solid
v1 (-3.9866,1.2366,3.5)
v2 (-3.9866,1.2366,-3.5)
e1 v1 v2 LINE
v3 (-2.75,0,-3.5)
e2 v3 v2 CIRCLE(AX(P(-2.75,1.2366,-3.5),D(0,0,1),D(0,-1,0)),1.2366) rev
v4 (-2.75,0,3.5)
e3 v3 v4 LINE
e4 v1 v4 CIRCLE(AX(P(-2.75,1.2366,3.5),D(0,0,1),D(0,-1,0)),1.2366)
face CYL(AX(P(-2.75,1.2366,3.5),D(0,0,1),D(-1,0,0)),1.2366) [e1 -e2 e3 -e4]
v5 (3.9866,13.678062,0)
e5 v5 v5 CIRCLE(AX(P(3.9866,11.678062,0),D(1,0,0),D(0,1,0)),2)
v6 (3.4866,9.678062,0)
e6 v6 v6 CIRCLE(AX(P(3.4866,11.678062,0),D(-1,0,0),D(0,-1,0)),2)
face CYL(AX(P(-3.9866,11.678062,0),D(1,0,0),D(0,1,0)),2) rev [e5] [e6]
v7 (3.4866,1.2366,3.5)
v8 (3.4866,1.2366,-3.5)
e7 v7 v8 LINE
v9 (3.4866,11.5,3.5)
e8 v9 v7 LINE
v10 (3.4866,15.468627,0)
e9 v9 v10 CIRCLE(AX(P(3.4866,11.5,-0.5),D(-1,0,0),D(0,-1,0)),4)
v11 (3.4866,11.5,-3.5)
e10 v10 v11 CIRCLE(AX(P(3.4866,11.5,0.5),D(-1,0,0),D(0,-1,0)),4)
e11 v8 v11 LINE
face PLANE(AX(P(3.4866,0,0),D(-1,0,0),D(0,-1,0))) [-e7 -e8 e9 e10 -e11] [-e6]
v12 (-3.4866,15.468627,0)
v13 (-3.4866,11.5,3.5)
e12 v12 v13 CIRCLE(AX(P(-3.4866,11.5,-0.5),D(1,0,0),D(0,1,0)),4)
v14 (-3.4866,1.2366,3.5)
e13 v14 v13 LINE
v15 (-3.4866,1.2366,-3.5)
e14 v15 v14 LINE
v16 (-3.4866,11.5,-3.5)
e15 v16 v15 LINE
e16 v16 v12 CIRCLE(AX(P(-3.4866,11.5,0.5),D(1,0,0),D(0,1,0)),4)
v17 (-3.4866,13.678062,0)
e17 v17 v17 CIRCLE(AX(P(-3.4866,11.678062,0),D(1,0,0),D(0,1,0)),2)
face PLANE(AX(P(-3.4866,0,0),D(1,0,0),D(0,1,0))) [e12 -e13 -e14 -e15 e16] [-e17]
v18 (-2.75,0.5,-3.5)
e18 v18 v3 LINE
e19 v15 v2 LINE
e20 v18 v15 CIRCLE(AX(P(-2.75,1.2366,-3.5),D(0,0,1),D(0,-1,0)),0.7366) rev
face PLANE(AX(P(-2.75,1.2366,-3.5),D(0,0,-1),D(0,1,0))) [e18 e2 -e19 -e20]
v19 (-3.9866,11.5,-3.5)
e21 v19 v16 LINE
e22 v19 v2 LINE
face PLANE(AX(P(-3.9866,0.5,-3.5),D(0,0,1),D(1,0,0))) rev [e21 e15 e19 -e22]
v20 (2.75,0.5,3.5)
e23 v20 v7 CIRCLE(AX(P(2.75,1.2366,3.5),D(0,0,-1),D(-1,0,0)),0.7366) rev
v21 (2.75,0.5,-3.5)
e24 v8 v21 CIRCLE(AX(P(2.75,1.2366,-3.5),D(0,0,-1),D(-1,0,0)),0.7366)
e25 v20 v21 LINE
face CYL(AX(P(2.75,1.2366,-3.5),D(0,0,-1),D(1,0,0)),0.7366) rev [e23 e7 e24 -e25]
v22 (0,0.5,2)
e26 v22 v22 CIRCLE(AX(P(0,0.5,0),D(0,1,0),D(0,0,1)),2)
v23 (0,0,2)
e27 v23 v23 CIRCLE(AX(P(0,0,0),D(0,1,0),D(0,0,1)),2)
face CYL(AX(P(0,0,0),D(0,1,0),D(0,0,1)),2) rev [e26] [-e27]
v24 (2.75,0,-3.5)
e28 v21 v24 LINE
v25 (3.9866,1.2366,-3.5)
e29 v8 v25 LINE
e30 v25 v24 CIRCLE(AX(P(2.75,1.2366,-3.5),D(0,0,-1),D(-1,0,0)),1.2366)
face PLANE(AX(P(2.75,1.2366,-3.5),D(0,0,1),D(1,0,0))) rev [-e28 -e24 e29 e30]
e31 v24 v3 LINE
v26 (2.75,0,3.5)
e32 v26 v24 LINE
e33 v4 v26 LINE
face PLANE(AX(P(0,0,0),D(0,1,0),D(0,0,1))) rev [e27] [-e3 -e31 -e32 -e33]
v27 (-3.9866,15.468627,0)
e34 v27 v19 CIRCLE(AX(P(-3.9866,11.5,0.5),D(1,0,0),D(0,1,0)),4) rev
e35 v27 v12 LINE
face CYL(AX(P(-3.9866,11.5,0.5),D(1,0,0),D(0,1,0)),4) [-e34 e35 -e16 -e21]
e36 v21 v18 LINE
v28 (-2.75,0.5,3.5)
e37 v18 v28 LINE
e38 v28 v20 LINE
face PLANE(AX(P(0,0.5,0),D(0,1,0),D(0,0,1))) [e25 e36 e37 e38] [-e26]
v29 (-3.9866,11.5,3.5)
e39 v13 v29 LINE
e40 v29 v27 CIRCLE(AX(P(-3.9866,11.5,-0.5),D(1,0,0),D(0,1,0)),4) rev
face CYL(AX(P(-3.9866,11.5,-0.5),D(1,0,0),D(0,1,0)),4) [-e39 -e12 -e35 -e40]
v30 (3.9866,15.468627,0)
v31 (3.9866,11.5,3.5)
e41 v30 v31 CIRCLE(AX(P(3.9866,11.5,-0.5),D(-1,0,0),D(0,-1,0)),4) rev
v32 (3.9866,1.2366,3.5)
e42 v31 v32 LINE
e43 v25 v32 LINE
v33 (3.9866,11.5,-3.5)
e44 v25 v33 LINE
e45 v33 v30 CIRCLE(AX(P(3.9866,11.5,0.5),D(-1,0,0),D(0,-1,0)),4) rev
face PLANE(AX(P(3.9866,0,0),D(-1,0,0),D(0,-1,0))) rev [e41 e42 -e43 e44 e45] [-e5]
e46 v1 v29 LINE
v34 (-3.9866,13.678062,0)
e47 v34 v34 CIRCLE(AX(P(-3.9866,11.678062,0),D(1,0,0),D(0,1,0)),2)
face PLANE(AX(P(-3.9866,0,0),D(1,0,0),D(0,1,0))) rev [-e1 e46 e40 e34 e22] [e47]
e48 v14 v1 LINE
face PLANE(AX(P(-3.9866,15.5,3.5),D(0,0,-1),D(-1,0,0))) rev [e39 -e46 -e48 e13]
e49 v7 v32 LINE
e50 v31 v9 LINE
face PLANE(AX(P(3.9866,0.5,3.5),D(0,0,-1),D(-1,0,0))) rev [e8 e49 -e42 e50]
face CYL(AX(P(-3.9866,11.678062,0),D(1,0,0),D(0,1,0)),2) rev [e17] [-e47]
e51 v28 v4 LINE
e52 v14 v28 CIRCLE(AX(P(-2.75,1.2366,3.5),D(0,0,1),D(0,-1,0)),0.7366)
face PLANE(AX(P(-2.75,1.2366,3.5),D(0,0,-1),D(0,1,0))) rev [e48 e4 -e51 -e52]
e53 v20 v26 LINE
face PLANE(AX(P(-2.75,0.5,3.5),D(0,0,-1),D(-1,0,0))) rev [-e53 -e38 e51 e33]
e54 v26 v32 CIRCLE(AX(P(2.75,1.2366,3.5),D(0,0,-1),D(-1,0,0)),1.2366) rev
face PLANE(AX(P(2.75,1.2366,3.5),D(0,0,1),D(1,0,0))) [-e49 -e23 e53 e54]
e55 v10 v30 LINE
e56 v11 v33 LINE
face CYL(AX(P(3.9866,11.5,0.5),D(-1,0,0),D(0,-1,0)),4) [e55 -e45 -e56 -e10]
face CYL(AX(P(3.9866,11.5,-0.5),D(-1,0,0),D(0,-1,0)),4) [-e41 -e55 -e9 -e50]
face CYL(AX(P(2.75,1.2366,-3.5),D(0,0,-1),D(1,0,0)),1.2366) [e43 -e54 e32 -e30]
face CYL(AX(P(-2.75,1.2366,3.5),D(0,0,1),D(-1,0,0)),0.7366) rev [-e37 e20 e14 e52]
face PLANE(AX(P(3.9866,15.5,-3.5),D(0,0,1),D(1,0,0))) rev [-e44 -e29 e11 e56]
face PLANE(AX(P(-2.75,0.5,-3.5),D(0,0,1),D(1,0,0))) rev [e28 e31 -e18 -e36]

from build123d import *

# Parameters (mm, degrees)
SKETCH1_W          = 5.5
SKETCH1_H          = 7
BASE_FLANGE1_DEPTH = 0.5
EDGE_FLANGE1_DEPTH = 7
EDGE_FLANGE2_DEPTH = 7
FILLET1_R          = 4
SKETCH12_R         = 2
CUT_EXTRUDE1_DEPTH = 16.880893326
SKETCH13_R         = 2
CUT_EXTRUDE2_DEPTH = 18.75106584


# Sheet-metal steps are written as plain solids
with BuildPart() as part:
    # Sketch1 → Base-Flange1 (new body)
    with BuildSketch(Plane(origin=(0, 0, 0), x_dir=(1, 0, 0), z_dir=(0, 1, 0))):
        Rectangle(SKETCH1_W, SKETCH1_H)
    extrude(amount=BASE_FLANGE1_DEPTH)

    # Edge-Flange1 section (across the edge) → Edge-Flange1 (add)
    with BuildSketch(Plane(origin=(3.4866, 0.5, 3.5), x_dir=(-1, 0, 0), z_dir=(0, 0, -1))):
        with BuildLine():
            Line((-0.5, 0.7366), (-0.5, 15))
            Line((-0.5, 15), (0, 15))
            Line((0, 15), (0, 0.7366))
            ThreePointArc((0, 0.7366), (0.215745145, 0.215745145), (0.7366, 0))
            Line((0.7366, 0), (0.7366, -0.5))
            ThreePointArc((0.7366, -0.5), (-0.137808246, -0.137808246), (-0.5, 0.7366))
        make_face()
    extrude(amount=EDGE_FLANGE1_DEPTH)

    # Edge-Flange2 section (across the edge) → Edge-Flange2 (add)
    with BuildSketch(Plane(origin=(-3.4866, 0.5, -3.5), x_dir=(1, 0, 0), z_dir=(0, 0, 1))):
        with BuildLine():
            Line((-0.5, 0.7366), (-0.5, 15))
            Line((-0.5, 15), (0, 15))
            Line((0, 15), (0, 0.7366))
            ThreePointArc((0, 0.7366), (0.215745145, 0.215745145), (0.7366, 0))
            Line((0.7366, 0), (0.7366, -0.5))
            ThreePointArc((0.7366, -0.5), (-0.137808246, -0.137808246), (-0.5, 0.7366))
        make_face()
    extrude(amount=EDGE_FLANGE2_DEPTH)

    # Fillet1
    # the kernel refuses this fillet: 4 mm, written as the material it takes off along each edge
    with BuildSketch(Plane(origin=(13.9866, 15.5, -3.5), x_dir=(0, -1, 0), z_dir=(-1, 0, 0)), Plane(origin=(13.9866, 15.5, 3.5), x_dir=(0, 0, -1), z_dir=(-1, 0, 0))) as fillet1_piece_1:
        with BuildLine():
            CenterArc((FILLET1_R, FILLET1_R), FILLET1_R, 180, 90)
            Line((0, FILLET1_R), (0, 0))
            Line((0, 0), (FILLET1_R, 0))
        make_face()
    extrude(amount=20.5, mode=Mode.SUBTRACT)
    with BuildSketch(Plane(origin=(-13.9866, 15.5, -3.5), x_dir=(0, -1, 0), z_dir=(1, 0, 0)), Plane(origin=(-13.9866, 15.5, 3.5), x_dir=(0, 0, -1), z_dir=(1, 0, 0))) as fillet1_piece_2:
        with BuildLine():
            CenterArc((FILLET1_R, -FILLET1_R), FILLET1_R, 90, 90)
            Line((0, -FILLET1_R), (0, 0))
            Line((0, 0), (FILLET1_R, 0))
        make_face()
    extrude(amount=20.5, mode=Mode.SUBTRACT)

    # Sketch12 → Cut-Extrude1 (cut, through all)
    with BuildSketch(Plane(origin=(0, 0.5, 0), x_dir=(1, 0, 0), z_dir=(0, 1, 0))):
        with Locations(Location((0, 0, 0), (0, 0, 270))):
            Circle(SKETCH12_R)
    extrude(amount=-CUT_EXTRUDE1_DEPTH, mode=Mode.SUBTRACT)

    # Sketch13 → Cut-Extrude2 (cut, through all)
    with BuildSketch(Plane(origin=(3.9866, 0, 0), x_dir=(0, 0, -1), z_dir=(1, 0, 0))):
        with Locations(Location((0, 11.678062377, 0), (0, 0, 90))):
            Circle(SKETCH13_R)
    extrude(amount=-CUT_EXTRUDE2_DEPTH, mode=Mode.SUBTRACT)


solid = part.part
